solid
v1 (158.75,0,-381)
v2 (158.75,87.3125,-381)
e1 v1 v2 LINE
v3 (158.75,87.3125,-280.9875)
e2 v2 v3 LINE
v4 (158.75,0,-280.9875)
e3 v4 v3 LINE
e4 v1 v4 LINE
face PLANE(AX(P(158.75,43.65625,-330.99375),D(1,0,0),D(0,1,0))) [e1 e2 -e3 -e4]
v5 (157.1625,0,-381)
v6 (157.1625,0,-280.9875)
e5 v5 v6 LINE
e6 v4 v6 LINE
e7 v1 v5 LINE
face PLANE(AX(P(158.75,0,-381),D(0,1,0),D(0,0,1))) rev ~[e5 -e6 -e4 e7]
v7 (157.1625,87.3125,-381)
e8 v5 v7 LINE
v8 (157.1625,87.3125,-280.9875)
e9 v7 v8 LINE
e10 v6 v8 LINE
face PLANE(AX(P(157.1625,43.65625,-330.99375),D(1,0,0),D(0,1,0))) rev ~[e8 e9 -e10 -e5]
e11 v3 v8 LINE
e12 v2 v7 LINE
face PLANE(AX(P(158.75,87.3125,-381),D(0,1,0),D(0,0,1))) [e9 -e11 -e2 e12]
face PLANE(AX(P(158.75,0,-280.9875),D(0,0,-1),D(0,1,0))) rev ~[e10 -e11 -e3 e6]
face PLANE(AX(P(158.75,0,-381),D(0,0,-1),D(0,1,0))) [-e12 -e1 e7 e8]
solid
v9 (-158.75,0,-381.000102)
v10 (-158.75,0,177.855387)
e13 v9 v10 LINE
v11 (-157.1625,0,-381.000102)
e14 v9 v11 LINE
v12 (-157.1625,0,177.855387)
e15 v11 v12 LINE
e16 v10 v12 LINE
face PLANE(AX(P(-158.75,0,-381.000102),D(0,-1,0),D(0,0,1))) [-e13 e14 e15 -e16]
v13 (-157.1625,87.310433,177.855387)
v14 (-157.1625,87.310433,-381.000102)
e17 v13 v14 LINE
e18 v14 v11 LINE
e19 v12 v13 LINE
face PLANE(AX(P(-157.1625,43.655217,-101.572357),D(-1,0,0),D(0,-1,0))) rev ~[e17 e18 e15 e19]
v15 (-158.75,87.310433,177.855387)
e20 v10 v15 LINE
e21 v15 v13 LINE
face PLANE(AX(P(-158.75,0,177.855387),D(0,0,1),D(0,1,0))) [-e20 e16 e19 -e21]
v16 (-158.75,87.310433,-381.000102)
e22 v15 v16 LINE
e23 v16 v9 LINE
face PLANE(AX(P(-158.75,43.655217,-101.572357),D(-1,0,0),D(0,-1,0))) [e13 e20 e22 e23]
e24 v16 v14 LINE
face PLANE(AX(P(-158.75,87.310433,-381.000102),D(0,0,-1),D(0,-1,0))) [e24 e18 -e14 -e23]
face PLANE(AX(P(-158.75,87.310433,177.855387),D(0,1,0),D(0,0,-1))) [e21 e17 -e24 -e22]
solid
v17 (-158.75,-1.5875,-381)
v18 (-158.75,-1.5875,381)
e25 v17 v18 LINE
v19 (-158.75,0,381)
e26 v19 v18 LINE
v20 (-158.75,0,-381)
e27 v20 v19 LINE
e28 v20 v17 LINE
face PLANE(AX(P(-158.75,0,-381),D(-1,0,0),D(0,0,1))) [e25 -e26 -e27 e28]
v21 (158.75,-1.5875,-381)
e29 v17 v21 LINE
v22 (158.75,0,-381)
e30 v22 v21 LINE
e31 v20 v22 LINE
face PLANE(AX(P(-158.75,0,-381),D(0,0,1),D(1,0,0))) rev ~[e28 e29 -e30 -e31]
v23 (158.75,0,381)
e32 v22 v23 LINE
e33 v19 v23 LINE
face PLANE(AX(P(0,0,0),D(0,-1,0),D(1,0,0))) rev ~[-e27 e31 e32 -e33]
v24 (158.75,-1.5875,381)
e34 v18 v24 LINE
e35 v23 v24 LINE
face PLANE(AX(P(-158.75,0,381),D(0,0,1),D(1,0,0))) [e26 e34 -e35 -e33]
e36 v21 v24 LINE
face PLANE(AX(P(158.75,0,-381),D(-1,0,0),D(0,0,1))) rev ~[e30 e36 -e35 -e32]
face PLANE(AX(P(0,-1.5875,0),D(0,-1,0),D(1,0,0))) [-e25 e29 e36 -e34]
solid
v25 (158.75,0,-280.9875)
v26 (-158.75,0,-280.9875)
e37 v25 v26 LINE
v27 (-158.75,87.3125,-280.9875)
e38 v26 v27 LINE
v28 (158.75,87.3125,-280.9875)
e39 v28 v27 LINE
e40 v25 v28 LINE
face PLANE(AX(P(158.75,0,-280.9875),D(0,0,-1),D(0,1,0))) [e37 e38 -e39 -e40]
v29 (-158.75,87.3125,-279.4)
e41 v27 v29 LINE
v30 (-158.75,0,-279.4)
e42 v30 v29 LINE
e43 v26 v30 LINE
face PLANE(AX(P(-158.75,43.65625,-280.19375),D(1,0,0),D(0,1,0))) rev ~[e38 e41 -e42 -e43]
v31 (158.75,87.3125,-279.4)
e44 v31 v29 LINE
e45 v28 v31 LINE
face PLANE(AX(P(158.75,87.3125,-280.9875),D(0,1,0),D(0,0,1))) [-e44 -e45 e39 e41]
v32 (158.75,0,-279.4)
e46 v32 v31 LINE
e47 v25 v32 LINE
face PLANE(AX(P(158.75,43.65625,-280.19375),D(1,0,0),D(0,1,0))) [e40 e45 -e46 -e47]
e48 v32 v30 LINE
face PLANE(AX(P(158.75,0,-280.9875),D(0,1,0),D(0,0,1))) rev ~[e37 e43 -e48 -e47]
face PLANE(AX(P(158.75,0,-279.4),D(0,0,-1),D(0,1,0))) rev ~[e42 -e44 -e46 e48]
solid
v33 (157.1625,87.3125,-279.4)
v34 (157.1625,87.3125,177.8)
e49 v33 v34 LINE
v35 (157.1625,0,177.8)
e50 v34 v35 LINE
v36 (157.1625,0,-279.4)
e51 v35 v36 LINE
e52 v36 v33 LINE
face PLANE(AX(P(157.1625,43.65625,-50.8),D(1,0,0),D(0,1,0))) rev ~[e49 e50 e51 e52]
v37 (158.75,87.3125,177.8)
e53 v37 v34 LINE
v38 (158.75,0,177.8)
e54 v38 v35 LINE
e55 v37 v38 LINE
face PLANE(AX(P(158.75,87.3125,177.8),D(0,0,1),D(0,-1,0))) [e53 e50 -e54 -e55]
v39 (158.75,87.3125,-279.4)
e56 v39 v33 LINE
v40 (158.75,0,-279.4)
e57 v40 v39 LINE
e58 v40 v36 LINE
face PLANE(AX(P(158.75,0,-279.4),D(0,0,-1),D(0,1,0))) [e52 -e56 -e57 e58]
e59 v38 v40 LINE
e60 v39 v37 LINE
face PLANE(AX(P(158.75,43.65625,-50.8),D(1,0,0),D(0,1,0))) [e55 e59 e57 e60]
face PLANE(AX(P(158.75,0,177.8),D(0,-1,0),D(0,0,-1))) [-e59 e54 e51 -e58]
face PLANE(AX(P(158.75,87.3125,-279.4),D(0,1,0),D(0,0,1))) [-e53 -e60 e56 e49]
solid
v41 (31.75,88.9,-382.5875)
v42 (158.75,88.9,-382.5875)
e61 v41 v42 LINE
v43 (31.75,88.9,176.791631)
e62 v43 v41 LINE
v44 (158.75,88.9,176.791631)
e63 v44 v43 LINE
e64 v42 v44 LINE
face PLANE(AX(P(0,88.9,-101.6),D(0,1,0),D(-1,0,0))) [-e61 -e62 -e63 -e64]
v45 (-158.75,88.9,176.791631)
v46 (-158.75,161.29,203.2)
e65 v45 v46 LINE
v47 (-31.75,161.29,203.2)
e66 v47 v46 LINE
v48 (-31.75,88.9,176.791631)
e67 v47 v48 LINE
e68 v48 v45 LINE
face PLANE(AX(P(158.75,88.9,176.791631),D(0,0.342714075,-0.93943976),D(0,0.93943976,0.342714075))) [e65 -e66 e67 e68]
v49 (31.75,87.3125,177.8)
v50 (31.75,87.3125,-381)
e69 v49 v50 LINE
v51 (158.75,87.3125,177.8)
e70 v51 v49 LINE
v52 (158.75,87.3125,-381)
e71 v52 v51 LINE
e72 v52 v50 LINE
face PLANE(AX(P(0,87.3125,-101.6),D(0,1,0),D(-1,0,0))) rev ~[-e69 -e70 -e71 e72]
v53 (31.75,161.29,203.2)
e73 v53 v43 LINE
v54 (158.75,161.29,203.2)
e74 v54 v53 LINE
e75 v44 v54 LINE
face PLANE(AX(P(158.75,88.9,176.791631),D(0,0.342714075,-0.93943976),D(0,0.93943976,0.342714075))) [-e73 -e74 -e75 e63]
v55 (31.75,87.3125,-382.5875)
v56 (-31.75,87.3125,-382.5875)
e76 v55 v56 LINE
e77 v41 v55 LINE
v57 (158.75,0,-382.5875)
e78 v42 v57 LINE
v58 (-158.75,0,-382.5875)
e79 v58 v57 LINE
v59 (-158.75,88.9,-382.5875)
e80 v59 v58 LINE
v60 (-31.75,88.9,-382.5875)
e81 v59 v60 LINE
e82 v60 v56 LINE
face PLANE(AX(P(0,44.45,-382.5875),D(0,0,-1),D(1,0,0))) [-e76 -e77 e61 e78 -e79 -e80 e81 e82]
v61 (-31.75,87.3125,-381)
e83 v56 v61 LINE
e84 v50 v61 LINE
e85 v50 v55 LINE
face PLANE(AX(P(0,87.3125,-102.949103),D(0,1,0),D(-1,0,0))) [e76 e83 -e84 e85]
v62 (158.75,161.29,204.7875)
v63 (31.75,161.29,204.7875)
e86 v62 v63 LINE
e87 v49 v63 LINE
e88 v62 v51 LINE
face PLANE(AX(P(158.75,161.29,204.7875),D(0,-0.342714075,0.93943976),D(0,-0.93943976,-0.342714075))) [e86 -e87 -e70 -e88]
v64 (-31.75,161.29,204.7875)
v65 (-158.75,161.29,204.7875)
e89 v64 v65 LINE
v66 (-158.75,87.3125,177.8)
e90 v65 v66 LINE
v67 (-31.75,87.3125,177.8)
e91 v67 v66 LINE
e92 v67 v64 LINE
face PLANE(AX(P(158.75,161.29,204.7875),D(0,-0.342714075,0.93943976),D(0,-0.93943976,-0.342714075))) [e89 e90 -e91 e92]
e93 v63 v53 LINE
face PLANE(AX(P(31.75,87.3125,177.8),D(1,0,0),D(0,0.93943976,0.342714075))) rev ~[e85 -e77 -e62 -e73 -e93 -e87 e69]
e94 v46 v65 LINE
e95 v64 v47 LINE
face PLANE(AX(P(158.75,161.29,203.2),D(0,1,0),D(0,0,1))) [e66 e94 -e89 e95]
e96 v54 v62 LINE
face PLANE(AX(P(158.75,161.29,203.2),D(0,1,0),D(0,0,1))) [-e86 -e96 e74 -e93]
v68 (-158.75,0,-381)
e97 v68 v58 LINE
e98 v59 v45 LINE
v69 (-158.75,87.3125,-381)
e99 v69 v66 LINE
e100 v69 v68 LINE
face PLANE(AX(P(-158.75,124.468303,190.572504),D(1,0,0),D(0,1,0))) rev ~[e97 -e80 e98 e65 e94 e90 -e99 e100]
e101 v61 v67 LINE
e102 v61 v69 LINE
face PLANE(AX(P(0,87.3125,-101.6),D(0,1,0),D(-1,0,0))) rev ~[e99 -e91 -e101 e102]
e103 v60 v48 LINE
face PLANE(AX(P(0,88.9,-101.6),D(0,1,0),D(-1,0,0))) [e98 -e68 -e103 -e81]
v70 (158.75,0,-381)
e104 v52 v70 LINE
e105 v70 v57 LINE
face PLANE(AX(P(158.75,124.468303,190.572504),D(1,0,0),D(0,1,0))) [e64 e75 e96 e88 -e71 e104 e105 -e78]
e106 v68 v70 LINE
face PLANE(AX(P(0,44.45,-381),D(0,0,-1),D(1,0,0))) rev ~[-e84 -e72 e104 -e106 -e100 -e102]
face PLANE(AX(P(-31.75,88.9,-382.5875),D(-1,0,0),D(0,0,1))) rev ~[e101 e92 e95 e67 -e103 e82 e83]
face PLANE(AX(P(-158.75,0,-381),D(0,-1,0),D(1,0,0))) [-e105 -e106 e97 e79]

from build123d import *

# Parameters (mm, degrees)
F0_W      = 317.5
F0_H      = 762
F1_DEPTH  = 1.5875
F2_W      = 317.5
F2_H      = 88.9
F3_DEPTH  = 1.5875
F4_W      = 317.5
F4_H      = 558.8
F5_DEPTH  = 1.5875
F7_DEPTH  = 317.5
F8_DEPTH  = 1.5875
F11_DEPTH = 1.5875
F12_W     = 31.75
F12_H     = 78.7464009495
F13_DEPTH = 1.5875
F15_DEPTH = 2.54
F16_DEPTH = 1.5875
F6_W      = 87.3125
F6_H      = 1.5875
F17_DEPTH = 317.5
F6_H_2    = 100.0125
F18_DEPTH = 1.5875


# Not quite as in the source:
# - a length typed as a fraction of an inch, garbled in the dataset ("3 / 203.2 mm" for 3/8 in), is restored


with BuildPart() as f1:
    # F0 (on Front) → F1 (new body)
    with BuildSketch(Plane.XZ):
        Rectangle(F0_W, F0_H)
    extrude(amount=F1_DEPTH)


with BuildPart() as f3:
    # F2 (on face) → F3 (new body)
    with BuildSketch(Plane(origin=(0, 0, -381), x_dir=(1, 0, 0), z_dir=(0, 0, -1))):
        with Locations((0, -44.45)):
            Rectangle(F2_W, F2_H)
    extrude(amount=F3_DEPTH)

    # F4 (on face) → F5 (join)
    with BuildSketch(Plane(origin=(0, 88.9, 0), x_dir=(-1, 0, 0), z_dir=(0, 1, 0))):
        with Locations((0, -101.6)):
            Rectangle(F4_W, F4_H)
    extrude(amount=-F5_DEPTH)

    # F6 (on face) → F7 (join)
    with BuildSketch(Plane.YZ.offset(158.75)):
        Polygon((161.29, 204.7875), (87.3125, 177.8), (88.9, 177.8), (88.9, 176.7916309013), (161.29, 203.2), align=None)
    extrude(amount=-F7_DEPTH)

    # F12 (on face) → F13 (cut)
    with BuildSketch(Plane(origin=(0, -46.9892412703, 128.8058025409), x_dir=(1, 0, 0), z_dir=(0, -0.3427140755, 0.9394397599))):
        with Locations((15.875, 182.332597133)):
            Rectangle(F12_W, F12_H)
        with Locations((-15.875, 182.332597133)):
            Rectangle(F12_W, F12_H)
    extrude(amount=-F13_DEPTH, mode=Mode.SUBTRACT)

    # F15 (cut): a face of the model
    f15_faces = [f3.faces().sort_by_distance(p)[0] for p in [
        (0, 87.5845292974, 177.0543196906),
    ]]
    extrude(f15_faces, amount=-F15_DEPTH, mode=Mode.SUBTRACT)

    # F14 (on face) → F16 (cut)
    with BuildSketch(Plane(origin=(0, 88.9, 0), x_dir=(-1, 0, 0), z_dir=(0, 1, 0))):
        Polygon((31.75, 176.689293971), (0, 176.689293971), (-31.75, 176.689293971), (-31.75, -382.5875), (0, -382.5875), (31.75, -382.5875), align=None)
    extrude(amount=-F16_DEPTH, mode=Mode.SUBTRACT)


with BuildPart() as f8:
    # F6 (on face) → F8 (new body)
    with BuildSketch(Plane.YZ.offset(158.75)):
        Polygon((87.3125, 176.2125), (87.3125, 177.8), (0, 177.8), (0, -279.4), (87.3125, -279.4), align=None)
    extrude(amount=-F8_DEPTH)


with BuildPart() as f11:
    # F10 (on face) → F11 (new body)
    with BuildSketch(Plane(origin=(-158.75, 0, 0), x_dir=(0, -1, 0), z_dir=(-1, 0, 0))):
        Polygon((0, -381), (0, 177.8553873301), (-87.3104333878, 177.8553873301), (-87.3104333878, -381.0001015663), (0, -381.0001015663), align=None)
    extrude(amount=-F11_DEPTH)


with BuildPart() as f17:
    # F6 (on face) → F17 (new body)
    with BuildSketch(Plane.YZ.offset(158.75)):
        with Locations((43.65625, -280.19375)):
            Rectangle(F6_W, F6_H)
    extrude(amount=-F17_DEPTH)


with BuildPart() as f18:
    # F6 (on face) → F18 (new body)
    with BuildSketch(Plane.YZ.offset(158.75)):
        with Locations((43.65625, -330.99375)):
            Rectangle(F6_W, F6_H_2)
    extrude(amount=-F18_DEPTH)


solid = Compound([f1.part, f3.part, f8.part, f11.part, f17.part, f18.part])
